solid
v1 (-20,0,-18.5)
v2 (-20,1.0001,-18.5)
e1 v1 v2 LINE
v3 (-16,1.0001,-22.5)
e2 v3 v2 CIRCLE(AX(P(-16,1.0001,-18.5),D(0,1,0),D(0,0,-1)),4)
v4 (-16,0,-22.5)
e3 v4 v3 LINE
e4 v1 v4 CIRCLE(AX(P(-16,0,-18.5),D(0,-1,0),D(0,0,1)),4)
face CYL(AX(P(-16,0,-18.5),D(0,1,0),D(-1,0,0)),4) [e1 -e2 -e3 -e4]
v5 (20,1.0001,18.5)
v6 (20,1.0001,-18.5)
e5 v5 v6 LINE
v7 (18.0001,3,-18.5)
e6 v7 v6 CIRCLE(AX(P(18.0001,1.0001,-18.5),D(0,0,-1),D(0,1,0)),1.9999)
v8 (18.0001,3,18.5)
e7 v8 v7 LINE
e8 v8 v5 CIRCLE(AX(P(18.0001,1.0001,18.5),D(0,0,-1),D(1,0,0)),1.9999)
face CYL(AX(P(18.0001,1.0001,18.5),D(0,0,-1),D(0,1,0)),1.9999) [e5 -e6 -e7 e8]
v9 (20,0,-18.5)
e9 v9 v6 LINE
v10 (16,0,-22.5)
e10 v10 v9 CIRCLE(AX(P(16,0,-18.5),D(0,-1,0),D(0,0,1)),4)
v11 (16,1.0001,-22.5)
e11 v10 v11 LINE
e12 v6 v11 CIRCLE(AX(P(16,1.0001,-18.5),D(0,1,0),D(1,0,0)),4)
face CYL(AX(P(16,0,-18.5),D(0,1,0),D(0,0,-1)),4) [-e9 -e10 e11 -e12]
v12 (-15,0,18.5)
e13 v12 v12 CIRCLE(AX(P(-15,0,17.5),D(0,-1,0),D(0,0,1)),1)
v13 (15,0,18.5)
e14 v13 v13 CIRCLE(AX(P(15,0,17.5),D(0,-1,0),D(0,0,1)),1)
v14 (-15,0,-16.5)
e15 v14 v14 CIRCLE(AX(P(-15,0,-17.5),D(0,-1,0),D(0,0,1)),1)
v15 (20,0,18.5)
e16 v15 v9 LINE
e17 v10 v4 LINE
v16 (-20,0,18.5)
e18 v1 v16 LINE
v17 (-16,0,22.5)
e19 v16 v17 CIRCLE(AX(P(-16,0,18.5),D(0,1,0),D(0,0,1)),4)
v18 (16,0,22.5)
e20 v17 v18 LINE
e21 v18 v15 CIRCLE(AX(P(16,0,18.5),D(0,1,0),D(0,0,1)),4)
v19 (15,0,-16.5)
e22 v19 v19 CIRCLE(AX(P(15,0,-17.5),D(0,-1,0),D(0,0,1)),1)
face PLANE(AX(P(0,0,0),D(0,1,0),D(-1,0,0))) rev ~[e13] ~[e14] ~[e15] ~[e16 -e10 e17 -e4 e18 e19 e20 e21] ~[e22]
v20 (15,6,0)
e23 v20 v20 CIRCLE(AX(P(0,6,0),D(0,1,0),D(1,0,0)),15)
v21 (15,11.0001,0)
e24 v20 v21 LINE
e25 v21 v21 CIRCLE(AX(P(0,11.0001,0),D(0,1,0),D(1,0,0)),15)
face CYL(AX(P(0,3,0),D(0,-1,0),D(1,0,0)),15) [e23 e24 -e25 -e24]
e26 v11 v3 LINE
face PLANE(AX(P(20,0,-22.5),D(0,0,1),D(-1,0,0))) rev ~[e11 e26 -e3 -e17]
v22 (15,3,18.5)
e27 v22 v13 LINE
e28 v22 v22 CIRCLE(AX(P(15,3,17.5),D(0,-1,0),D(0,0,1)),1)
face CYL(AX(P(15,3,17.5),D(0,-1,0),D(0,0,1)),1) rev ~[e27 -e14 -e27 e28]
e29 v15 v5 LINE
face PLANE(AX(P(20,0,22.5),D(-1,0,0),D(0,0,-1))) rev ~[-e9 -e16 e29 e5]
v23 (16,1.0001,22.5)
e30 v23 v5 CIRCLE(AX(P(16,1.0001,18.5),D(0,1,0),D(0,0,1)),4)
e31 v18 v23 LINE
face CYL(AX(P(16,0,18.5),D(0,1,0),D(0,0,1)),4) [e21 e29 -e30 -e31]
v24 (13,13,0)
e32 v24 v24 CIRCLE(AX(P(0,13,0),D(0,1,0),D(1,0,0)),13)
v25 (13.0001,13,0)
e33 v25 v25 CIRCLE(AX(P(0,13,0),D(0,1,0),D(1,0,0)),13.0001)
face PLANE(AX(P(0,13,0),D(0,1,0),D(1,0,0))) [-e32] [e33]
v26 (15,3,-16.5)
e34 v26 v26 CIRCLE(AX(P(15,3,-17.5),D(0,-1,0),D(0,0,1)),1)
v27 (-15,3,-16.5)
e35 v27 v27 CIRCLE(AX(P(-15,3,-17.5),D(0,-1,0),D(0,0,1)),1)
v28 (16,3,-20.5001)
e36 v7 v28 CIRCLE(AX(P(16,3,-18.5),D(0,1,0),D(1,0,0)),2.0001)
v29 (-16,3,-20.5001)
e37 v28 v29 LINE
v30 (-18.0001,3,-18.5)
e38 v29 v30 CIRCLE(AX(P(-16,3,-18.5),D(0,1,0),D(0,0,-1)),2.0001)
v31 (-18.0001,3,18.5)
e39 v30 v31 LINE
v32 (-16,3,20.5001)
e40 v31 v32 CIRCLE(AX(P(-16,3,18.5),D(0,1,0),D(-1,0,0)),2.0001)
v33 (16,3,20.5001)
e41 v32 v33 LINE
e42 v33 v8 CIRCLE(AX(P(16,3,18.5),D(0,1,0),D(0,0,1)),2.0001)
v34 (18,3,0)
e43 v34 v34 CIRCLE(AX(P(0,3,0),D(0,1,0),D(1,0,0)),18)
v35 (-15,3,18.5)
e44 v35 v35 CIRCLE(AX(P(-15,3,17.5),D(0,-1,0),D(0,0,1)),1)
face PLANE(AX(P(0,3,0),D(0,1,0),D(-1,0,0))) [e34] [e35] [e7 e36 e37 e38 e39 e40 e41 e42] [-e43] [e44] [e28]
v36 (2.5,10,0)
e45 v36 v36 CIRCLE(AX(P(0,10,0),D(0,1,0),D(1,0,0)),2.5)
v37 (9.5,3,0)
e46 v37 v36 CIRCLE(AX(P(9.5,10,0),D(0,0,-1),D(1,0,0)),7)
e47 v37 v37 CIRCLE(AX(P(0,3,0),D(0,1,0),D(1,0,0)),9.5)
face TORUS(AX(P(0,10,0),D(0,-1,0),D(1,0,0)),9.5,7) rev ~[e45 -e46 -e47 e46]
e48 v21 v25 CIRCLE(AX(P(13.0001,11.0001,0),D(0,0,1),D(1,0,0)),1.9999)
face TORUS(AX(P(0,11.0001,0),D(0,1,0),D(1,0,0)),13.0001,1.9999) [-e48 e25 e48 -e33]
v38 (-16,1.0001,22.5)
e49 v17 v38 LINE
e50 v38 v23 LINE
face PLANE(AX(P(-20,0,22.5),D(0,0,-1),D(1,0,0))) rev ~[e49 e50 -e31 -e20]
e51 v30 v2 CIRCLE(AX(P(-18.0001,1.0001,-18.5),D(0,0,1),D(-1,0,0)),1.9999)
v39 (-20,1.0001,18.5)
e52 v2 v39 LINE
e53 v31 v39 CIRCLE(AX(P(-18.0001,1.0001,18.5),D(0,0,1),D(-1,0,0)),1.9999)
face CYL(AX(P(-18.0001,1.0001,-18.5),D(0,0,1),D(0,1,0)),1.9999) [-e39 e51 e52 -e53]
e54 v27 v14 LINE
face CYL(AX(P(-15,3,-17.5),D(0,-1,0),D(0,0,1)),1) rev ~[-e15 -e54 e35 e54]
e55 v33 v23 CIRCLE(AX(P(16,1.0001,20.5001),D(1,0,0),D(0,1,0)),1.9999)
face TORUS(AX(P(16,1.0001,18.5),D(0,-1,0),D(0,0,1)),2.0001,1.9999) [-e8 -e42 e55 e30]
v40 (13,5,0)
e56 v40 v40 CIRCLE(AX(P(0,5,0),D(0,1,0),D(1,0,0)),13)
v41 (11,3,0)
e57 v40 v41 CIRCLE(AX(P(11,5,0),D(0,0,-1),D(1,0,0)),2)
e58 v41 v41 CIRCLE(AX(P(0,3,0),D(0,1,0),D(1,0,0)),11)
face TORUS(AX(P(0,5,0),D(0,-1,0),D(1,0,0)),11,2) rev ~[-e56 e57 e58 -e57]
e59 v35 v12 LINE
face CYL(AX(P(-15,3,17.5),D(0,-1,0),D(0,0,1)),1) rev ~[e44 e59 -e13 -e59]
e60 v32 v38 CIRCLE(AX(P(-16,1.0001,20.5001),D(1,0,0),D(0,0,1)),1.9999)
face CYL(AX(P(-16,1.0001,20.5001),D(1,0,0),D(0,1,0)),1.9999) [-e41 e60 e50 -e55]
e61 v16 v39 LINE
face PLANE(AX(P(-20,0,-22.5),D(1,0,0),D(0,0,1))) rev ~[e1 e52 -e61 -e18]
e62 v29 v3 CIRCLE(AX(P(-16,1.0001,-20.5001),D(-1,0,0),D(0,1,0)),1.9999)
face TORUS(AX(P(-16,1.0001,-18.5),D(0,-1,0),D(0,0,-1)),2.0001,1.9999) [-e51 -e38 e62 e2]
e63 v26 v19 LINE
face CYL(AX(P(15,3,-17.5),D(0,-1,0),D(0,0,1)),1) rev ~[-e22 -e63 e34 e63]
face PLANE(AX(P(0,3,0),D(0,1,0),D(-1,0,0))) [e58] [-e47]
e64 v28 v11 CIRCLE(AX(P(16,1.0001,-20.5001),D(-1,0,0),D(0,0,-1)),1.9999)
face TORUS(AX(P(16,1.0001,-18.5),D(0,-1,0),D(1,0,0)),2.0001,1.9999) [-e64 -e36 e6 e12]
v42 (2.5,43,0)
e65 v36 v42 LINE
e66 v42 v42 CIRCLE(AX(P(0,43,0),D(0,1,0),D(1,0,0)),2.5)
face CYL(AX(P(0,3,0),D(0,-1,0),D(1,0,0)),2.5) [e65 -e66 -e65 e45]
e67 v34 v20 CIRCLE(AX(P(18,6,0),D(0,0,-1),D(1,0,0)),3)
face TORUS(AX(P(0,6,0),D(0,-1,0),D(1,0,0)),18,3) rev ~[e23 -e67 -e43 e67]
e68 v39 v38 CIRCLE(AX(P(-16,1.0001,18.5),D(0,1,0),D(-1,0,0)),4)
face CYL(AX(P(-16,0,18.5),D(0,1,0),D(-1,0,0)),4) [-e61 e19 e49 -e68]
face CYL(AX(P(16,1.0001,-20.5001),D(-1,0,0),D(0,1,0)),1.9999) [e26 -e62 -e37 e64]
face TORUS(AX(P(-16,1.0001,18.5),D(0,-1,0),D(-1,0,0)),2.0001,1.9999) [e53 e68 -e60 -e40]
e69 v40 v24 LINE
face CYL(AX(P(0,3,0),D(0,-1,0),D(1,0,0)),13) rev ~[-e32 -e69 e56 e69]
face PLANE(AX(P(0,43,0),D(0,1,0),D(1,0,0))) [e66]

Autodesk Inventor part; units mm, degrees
ref_plane "YZ Plane" through (0, 0, 0) normal (1, 0, 0) x (0, 1, 0)
ref_plane "XZ Plane" through (0, 0, 0) normal (0, 1, 0) x (-1, 0, 0)
ref_plane "XY Plane" through (0, 0, 0) normal (0, 0, 1) x (1, 0, 0)
sketch "Sketch1" plane through (0, 0, 0) normal (0, 1, 0) x (-1, 0, 0)
  line L0 (20, 22.5) -> (-20, 22.5)
  line L1 (-20, 22.5) -> (-20, -22.5)
  line L2 (-20, -22.5) -> (20, -22.5)
  line L3 (20, -22.5) -> (20, 22.5)
  point P0 (0, 0)
  point P1 (-20, 0)
  point P2 (20, 0)
  point P3 (0, 22.5)
  point P4 (0, -22.5)
  dimension "d2" = 45
  dimension "d3" = 40
extrude "Extrusion1" add sketch "Sketch1" along normal blind 3
sketch "Sketch2" plane through (0, 3, 0) normal (0, 1, 0) x (1, 0, 0)
  circle A0 centre (0, 0) radius 2.5
  dimension "d4" = 5
extrude "Extrusion2" add sketch "Sketch2" along normal blind 40
fillet "Fillet1" radius 7 1 edges at (-2.5, 3, 0)
sketch "Sketch3" plane through (0, 3, 0) normal (0, 1, 0) x (1, 0, 0)
  circle A0 centre (0, 0) radius 13
  circle A1 centre (0, 0) radius 15
  dimension "d8" = 26
  dimension "d9" = 30
extrude "Extrusion3" add sketch "Sketch3" along normal blind 10
sketch "Sketch4" plane through (0, 3, 0) normal (0, 1, 0) x (1, 0, 0)
  line L0 (20, 22.5) -> (-20, 22.5) projected
  line L1 (20, -22.5) -> (20, 22.5) projected
  line L2 (-20, -22.5) -> (20, -22.5) projected
  line L3 (-20, 22.5) -> (-20, -22.5) projected
  point P0 (0, 0)
  point P1 (15, -17.5)
  point P2 (15, 17.5)
  point P3 (-15, 17.5)
  point P4 (-15, -17.5)
  dimension "d12" = 5
  dimension "d13" = 5
  dimension "d14" = 5
  dimension "d15" = 5
  dimension "d16" = 5
  dimension "d17" = 5
  dimension "d18" = 5
  dimension "d19" = 5
hole "Hole1" at (15, 3, 17.5) at (15, 3, -17.5) at (-15, 3, -17.5) at (-15, 3, 17.5) direction (0, -1, 0) diameter 2 end through all
fillet "Fillet2" radius 3 1 edges at (-15, 3, 0)
fillet "Fillet3" radius 2 1 edges at (-13, 3, 0)
fillet "Fillet4" radius 4 4 edges at (20, 1.5, 22.5) (20, 1.5, -22.5) (-20, 1.5, 22.5) (-20, 1.5, -22.5)
fillet "Fillet5" radius 2 8 edges at (-18.8284, 3, 21.3284) (0, 3, 22.5) (18.8284, 3, 21.3284) (20, 3, 0) (18.8284, 3, -21.3284) (0, 3, -22.5) (-18.8284, 3, -21.3284) (-20, 3, 0)
fillet "Fillet6" radius 2 1 edges at (-15, 13, 0)
equation "\"d13\" = d12"
equation "\"d14\" = d15"
equation "\"d17\" = d16"
equation "\"d19\" = d18"
properties part number "Upper_part"
